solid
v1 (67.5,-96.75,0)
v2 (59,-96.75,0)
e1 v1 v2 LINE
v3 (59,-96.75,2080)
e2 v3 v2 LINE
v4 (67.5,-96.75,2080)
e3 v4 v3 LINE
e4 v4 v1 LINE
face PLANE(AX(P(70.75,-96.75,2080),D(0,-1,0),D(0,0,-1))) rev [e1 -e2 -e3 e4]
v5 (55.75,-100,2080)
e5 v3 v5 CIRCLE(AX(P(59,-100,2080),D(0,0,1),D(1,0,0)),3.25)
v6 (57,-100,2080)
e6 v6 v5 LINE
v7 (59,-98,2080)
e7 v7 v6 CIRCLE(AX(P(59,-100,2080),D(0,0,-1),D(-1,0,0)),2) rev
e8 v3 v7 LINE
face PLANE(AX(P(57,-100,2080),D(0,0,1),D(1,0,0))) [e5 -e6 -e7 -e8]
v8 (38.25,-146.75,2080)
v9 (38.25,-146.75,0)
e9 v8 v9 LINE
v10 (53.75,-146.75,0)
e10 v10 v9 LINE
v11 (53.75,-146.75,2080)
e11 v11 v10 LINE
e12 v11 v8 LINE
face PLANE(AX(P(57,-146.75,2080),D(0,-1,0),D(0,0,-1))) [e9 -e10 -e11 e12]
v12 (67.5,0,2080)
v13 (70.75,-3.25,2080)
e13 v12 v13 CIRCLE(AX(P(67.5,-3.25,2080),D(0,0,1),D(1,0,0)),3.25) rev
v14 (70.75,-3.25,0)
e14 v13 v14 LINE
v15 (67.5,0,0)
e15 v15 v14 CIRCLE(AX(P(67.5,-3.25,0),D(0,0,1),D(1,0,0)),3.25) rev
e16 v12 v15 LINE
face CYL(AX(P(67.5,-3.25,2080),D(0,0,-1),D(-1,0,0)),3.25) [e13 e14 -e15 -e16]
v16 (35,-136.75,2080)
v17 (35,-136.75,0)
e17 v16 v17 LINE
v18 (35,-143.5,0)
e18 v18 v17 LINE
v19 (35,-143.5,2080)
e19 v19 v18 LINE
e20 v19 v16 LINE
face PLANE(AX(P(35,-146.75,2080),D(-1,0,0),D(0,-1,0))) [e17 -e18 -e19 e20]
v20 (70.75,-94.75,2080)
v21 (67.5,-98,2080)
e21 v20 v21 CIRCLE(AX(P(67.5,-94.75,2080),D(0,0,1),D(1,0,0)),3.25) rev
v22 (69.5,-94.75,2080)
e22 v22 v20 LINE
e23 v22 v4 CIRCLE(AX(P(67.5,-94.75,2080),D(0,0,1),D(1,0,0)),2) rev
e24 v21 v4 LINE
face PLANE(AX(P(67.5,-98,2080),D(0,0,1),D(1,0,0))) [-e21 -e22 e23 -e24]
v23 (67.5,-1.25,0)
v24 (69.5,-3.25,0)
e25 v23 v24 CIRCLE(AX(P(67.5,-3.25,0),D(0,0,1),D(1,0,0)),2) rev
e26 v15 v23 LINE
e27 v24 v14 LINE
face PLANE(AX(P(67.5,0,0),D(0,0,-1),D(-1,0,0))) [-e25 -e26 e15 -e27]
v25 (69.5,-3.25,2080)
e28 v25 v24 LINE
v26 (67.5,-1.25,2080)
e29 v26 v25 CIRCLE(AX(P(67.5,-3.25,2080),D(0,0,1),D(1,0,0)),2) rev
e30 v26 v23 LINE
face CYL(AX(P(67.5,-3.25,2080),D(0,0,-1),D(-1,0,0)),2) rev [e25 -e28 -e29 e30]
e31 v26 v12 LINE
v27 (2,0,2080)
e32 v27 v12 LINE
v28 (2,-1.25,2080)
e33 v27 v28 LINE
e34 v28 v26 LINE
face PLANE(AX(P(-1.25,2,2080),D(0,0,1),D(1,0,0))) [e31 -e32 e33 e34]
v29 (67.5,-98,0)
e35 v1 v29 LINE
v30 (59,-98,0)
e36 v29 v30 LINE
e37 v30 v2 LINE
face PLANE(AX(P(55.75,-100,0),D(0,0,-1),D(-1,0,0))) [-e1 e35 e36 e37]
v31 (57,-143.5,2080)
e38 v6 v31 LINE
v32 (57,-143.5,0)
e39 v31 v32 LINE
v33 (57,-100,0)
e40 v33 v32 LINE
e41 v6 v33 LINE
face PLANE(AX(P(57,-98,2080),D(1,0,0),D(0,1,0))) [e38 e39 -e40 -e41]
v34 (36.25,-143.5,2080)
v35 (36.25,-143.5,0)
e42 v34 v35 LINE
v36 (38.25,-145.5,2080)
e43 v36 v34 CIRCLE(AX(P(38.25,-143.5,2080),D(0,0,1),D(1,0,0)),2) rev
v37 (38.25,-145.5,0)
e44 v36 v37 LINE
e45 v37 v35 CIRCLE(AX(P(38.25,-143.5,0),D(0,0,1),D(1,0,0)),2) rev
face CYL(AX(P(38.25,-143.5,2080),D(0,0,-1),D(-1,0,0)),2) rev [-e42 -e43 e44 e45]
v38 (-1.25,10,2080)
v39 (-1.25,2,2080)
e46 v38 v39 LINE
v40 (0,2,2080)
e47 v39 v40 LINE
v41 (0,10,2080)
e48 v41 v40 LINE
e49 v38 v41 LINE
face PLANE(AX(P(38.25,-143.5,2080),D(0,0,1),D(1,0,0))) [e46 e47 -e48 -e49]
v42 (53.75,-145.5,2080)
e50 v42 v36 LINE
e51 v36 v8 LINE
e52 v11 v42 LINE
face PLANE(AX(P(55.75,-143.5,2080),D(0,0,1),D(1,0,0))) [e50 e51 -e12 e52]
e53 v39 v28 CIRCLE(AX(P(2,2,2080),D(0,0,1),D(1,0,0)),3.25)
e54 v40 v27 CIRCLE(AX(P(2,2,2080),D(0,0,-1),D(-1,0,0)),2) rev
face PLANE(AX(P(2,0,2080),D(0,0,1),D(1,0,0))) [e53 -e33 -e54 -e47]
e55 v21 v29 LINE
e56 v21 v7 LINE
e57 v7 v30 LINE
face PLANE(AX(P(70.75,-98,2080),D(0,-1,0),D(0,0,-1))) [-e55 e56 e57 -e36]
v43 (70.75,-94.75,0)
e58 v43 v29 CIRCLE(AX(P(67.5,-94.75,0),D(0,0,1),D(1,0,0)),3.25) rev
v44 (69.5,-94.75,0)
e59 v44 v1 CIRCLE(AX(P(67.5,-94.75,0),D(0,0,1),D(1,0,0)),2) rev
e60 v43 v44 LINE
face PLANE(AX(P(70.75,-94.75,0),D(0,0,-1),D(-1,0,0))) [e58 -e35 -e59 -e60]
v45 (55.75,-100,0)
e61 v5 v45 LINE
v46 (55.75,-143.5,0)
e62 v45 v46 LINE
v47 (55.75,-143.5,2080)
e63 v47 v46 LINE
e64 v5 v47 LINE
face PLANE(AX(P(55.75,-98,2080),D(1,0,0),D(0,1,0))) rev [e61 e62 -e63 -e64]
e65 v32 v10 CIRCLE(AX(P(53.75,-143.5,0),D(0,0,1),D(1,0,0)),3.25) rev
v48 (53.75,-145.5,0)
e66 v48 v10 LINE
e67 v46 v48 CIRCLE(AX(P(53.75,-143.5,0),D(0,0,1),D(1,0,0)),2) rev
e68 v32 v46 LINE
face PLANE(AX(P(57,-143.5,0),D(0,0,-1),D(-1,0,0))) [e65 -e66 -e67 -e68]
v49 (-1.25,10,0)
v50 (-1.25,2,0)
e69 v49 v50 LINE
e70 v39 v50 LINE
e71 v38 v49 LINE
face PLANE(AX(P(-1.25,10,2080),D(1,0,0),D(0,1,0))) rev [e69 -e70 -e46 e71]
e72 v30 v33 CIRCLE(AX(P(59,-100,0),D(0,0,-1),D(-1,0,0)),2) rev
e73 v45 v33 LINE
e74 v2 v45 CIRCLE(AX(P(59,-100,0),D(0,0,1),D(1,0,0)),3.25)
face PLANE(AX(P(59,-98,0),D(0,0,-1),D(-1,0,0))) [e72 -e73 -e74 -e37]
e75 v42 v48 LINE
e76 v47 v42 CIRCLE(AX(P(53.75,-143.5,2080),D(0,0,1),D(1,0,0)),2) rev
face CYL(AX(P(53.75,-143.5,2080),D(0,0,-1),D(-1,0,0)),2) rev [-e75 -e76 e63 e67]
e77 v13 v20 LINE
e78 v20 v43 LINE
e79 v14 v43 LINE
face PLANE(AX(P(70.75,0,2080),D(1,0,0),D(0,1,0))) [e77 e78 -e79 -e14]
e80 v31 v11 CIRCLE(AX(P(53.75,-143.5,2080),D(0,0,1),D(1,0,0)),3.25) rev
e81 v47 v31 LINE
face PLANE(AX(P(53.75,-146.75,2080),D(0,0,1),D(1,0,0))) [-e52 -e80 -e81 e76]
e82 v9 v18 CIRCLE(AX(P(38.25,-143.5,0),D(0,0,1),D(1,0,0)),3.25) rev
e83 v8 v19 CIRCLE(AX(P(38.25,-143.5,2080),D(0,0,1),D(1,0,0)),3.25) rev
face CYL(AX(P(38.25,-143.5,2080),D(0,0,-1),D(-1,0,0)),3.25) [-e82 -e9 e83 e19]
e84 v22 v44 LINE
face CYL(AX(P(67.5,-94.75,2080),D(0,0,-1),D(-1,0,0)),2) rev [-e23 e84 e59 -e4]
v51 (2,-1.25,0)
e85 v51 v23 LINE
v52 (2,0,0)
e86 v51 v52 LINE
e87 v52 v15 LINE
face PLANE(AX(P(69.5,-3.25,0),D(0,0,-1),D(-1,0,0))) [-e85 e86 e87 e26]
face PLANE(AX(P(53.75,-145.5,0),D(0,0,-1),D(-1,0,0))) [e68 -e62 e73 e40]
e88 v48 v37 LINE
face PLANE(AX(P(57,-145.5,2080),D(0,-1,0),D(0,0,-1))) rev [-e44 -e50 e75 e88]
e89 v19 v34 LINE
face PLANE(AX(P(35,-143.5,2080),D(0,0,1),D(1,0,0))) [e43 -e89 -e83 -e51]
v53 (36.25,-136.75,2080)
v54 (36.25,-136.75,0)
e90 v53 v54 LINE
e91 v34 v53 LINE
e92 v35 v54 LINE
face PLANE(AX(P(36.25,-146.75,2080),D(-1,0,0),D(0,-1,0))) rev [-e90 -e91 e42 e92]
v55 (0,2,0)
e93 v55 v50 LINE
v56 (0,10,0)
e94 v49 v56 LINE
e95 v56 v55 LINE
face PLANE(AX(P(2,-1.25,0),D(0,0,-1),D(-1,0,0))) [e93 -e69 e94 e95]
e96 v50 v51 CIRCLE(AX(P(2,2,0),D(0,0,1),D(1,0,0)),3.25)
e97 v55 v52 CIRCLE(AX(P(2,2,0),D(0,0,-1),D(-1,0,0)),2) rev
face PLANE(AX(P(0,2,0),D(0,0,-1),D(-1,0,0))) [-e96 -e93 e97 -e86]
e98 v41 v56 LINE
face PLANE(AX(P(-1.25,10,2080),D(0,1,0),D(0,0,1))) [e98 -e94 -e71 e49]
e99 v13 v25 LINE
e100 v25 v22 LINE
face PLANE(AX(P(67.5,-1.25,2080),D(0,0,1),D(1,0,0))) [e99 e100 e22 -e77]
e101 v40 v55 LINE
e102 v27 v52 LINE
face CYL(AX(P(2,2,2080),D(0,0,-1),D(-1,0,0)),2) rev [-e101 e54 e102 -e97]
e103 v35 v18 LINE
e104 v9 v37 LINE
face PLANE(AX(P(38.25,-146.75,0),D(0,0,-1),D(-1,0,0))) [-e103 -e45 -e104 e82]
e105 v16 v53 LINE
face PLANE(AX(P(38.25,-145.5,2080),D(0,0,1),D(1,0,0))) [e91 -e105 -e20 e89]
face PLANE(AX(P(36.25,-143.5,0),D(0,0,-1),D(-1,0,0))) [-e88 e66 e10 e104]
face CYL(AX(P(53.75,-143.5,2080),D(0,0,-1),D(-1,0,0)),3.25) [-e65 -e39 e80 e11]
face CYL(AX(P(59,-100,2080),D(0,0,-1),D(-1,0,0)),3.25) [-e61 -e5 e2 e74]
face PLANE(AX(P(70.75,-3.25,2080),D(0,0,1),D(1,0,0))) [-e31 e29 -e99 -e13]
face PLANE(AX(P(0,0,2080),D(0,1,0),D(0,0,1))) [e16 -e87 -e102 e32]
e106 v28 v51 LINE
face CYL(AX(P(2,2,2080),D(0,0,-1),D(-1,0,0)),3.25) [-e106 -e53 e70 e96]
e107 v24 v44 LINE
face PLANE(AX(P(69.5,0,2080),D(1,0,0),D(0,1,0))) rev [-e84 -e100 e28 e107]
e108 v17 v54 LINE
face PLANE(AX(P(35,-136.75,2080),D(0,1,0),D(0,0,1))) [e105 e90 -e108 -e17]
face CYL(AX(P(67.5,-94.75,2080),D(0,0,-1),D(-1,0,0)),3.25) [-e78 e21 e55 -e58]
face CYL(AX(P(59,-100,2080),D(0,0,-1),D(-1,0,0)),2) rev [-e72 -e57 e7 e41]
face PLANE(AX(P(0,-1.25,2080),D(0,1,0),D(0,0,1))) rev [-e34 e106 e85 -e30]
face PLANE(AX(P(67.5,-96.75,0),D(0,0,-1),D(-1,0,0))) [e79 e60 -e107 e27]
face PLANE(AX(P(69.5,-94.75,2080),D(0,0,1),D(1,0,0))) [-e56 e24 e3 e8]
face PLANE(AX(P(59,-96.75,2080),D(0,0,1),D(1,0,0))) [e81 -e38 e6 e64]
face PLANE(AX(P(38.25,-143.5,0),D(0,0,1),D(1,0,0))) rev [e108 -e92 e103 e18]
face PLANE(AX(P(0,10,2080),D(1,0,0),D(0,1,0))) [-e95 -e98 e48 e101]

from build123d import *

# Parameters (mm, degrees)
BASE_FLANGE1_DEPTH = 2080


# Sheet-metal steps are written as plain solids
with BuildPart() as part:
    # Sketch1 → Base-Flange1 (new body)
    with BuildSketch(Plane.XY):
        with BuildLine():
            Line((0, 10), (0, 2))
            ThreePointArc((0, 2), (0.585786438, 0.585786438), (2, 0))
            Line((2, 0), (67.5, 0))
            ThreePointArc((67.5, 0), (69.798097039, -0.951902961), (70.75, -3.25))
            Line((70.75, -3.25), (70.75, -94.75))
            ThreePointArc((70.75, -94.75), (69.798097039, -97.048097039), (67.5, -98))
            Line((67.5, -98), (59, -98))
            ThreePointArc((59, -98), (57.585786438, -98.585786438), (57, -100))
            Line((57, -100), (57, -143.5))
            ThreePointArc((57, -143.5), (56.048097039, -145.798097039), (53.75, -146.75))
            Line((53.75, -146.75), (38.25, -146.75))
            ThreePointArc((38.25, -146.75), (35.951902961, -145.798097039), (35, -143.5))
            Line((35, -143.5), (35, -136.75))
            Line((35, -136.75), (36.25, -136.75))
            Line((36.25, -136.75), (36.25, -143.5))
            ThreePointArc((36.25, -143.5), (36.835786438, -144.914213562), (38.25, -145.5))
            Line((38.25, -145.5), (53.75, -145.5))
            ThreePointArc((53.75, -145.5), (55.164213562, -144.914213562), (55.75, -143.5))
            Line((55.75, -143.5), (55.75, -100))
            ThreePointArc((55.75, -100), (56.701902961, -97.701902961), (59, -96.75))
            Line((59, -96.75), (67.5, -96.75))
            ThreePointArc((67.5, -96.75), (68.914213562, -96.164213562), (69.5, -94.75))
            Line((69.5, -94.75), (69.5, -3.25))
            ThreePointArc((69.5, -3.25), (68.914213562, -1.835786438), (67.5, -1.25))
            Line((67.5, -1.25), (2, -1.25))
            ThreePointArc((2, -1.25), (-0.298097039, -0.298097039), (-1.25, 2))
            Line((-1.25, 2), (-1.25, 10))
            Line((-1.25, 10), (0, 10))
        make_face()
    extrude(amount=BASE_FLANGE1_DEPTH)


solid = part.part
